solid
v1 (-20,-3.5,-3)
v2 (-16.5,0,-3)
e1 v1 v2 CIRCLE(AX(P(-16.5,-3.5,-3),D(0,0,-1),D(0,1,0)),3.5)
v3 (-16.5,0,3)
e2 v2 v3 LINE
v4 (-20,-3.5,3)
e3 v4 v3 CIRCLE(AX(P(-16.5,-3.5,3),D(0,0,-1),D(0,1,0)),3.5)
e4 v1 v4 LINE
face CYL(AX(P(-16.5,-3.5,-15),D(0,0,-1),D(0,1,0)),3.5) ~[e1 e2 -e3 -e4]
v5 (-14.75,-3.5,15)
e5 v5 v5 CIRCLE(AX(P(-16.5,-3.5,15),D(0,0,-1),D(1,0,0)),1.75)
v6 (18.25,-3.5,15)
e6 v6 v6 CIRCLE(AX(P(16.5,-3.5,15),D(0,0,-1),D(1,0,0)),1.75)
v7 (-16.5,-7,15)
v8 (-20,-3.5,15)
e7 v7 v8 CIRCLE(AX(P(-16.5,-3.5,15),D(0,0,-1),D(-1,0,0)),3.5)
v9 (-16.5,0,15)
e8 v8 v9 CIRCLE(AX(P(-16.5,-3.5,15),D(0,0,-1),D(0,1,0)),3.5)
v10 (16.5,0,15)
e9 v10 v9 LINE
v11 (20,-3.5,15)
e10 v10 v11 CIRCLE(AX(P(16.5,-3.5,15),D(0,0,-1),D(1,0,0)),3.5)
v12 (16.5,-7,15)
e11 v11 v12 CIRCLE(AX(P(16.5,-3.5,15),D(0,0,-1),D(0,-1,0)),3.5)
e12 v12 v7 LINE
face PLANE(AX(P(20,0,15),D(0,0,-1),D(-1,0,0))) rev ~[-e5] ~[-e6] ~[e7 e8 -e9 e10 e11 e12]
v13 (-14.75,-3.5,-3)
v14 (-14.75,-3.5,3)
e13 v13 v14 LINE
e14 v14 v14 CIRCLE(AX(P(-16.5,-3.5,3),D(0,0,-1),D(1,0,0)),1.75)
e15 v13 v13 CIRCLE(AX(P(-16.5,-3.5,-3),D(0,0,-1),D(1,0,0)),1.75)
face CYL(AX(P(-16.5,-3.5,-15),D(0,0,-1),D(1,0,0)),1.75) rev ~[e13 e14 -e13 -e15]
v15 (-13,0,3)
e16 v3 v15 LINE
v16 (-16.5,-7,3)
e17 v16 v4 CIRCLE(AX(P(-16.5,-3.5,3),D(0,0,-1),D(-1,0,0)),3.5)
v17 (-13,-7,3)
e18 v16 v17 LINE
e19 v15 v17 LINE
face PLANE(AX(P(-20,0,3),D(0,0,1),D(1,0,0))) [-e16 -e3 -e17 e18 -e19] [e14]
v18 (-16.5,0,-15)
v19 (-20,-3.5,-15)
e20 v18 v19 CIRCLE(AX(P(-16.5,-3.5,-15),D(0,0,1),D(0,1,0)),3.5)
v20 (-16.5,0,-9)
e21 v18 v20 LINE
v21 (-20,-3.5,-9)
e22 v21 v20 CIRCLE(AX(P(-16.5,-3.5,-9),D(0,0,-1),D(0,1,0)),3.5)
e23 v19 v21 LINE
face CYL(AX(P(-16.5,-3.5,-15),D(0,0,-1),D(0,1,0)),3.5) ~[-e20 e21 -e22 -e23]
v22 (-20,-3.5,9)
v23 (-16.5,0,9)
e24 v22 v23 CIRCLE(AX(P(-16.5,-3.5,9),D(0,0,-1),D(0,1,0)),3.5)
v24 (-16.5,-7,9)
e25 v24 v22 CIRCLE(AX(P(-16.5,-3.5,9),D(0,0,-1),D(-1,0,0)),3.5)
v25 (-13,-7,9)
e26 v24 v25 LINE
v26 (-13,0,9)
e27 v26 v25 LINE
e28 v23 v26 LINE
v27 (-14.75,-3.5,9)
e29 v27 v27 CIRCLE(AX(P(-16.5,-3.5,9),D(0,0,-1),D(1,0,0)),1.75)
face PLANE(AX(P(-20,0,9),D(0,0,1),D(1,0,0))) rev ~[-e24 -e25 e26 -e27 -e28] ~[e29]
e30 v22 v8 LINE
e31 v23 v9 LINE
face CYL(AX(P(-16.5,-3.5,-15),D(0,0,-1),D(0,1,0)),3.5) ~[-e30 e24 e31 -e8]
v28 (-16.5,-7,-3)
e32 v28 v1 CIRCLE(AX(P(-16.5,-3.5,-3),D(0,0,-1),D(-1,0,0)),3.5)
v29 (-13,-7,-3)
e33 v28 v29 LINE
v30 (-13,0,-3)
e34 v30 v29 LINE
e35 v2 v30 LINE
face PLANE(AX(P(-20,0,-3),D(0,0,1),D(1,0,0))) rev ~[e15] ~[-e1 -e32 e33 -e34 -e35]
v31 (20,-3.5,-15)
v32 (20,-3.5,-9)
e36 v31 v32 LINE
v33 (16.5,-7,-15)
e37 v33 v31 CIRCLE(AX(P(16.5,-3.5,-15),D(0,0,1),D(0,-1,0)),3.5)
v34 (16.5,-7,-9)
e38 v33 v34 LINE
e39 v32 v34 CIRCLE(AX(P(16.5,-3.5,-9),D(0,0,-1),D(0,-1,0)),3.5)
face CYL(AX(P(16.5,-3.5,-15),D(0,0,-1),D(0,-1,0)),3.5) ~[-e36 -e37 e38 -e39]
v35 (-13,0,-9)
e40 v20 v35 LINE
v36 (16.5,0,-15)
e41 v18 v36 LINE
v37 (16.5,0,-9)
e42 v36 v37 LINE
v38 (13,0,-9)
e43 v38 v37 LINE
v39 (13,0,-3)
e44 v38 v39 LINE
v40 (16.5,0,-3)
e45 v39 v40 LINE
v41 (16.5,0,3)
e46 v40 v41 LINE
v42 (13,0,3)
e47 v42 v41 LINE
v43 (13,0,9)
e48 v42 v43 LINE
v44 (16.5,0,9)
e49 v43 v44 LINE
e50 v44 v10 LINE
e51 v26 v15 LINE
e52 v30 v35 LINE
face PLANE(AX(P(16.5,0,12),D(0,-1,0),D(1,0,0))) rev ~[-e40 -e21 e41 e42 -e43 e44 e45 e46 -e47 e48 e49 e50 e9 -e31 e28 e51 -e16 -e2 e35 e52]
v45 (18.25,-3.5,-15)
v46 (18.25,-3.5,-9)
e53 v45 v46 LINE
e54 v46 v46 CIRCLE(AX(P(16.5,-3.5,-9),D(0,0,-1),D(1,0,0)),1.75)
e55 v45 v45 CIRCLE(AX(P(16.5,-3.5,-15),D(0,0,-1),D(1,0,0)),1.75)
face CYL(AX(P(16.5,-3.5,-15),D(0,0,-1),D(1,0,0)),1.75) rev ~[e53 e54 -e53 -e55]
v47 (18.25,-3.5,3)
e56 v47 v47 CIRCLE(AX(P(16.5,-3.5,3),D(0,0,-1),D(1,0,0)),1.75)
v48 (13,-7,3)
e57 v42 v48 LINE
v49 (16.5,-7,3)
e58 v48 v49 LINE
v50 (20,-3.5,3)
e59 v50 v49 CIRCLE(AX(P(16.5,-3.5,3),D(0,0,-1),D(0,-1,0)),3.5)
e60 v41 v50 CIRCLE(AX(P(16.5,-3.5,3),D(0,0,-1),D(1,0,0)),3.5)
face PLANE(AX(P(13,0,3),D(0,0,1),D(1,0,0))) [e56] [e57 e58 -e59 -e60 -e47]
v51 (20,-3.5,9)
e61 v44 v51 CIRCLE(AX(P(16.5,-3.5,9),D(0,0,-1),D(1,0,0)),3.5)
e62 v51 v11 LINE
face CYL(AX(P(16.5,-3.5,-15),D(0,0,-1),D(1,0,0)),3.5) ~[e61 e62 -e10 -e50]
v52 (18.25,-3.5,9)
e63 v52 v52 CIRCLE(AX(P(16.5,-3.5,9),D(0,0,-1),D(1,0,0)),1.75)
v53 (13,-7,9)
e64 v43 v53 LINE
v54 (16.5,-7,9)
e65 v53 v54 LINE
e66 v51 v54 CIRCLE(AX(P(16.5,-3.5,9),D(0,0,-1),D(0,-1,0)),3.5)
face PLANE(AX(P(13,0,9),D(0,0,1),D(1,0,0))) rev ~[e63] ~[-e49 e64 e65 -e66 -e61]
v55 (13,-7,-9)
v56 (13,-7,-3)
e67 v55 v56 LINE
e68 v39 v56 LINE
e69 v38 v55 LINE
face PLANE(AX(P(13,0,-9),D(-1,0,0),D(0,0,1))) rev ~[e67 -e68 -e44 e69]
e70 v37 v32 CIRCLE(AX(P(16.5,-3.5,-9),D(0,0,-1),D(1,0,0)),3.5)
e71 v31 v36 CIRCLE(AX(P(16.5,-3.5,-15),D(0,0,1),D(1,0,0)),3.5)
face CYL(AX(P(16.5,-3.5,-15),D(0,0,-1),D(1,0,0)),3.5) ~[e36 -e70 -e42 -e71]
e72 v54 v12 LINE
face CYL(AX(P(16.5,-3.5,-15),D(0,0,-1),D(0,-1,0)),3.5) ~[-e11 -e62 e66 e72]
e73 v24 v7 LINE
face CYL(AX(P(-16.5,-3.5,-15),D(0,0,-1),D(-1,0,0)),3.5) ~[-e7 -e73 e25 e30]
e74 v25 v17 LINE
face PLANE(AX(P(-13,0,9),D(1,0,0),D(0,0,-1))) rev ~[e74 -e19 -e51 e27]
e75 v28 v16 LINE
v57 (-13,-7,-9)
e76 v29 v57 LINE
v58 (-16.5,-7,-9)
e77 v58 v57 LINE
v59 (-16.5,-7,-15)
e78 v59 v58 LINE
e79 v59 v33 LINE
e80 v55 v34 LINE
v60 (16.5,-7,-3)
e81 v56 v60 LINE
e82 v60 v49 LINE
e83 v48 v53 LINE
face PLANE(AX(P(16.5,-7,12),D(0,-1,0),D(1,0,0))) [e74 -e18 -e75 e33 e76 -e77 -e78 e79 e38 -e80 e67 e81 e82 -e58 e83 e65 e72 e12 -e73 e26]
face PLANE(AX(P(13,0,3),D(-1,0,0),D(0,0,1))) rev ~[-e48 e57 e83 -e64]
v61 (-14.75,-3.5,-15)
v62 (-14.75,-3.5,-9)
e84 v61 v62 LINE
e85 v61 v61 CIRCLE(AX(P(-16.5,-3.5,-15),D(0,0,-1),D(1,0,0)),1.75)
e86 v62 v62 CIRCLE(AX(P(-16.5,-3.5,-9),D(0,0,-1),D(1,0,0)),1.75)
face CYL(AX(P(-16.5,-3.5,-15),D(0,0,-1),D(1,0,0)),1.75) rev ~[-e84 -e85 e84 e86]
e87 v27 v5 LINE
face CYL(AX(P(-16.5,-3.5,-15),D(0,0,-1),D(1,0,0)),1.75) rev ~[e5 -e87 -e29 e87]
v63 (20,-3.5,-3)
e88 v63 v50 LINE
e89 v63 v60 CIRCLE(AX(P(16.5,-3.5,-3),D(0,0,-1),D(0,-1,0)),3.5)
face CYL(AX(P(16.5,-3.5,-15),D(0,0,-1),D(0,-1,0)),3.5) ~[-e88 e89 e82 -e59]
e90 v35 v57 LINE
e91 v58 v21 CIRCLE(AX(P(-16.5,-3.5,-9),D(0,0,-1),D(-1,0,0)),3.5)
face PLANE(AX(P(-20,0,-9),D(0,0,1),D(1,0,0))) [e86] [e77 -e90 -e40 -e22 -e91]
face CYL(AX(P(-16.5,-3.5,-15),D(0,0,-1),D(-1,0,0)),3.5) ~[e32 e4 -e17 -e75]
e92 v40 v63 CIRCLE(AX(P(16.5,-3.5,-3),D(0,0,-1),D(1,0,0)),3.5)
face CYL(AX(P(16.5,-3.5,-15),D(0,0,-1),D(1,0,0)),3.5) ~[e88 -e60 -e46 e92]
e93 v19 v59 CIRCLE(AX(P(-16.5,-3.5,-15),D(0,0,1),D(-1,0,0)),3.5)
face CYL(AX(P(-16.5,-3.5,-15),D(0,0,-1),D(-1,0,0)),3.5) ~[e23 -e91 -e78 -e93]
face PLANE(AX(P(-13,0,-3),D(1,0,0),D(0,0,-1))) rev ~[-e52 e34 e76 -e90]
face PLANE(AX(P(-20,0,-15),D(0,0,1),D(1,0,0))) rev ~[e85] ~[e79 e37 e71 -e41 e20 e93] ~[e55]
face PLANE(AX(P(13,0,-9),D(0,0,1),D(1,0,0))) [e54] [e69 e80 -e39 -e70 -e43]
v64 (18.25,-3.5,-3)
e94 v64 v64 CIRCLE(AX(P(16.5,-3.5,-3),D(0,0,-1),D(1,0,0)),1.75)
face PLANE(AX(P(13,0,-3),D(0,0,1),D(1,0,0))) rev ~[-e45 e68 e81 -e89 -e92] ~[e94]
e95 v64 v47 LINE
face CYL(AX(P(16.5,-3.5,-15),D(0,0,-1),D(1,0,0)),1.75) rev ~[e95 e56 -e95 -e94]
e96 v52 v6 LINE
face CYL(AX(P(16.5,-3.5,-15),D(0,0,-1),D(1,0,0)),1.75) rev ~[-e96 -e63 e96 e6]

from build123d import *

# Parameters (mm, degrees)
F0_W     = 7
F0_H     = 6
F1_DEPTH = 7
F2_R     = 1.75
F3_DEPTH = 30.001


# Not quite as in the source:
# - a feature names something its author has since deleted; it is built from what else it names


with BuildPart() as f1:
    # F0 (on Front) → F1 (new body)
    with BuildSketch(Plane.XZ):
        with Locations((16.5, 12)):
            Rectangle(F0_W, F0_H)
        with Locations((16.5, -12)):
            Rectangle(F0_W, F0_H)
        with Locations((16.5, 0)):
            Rectangle(F0_W, F0_H)
        with Locations((-16.5, 12)):
            Rectangle(F0_W, F0_H)
        with Locations((-16.5, 0)):
            Rectangle(F0_W, F0_H)
        with Locations((-16.5, -12)):
            Rectangle(F0_W, F0_H)
        Polygon((13, 9), (13, 15), (-13, 15), (-13, 9), (-13, 3), (-13, -3), (-13, -9), (-13, -15), (13, -15), (13, -9), (13, -3), (13, 3), align=None)
    extrude(amount=F1_DEPTH)

    # F2 (on face) → F3 (cut, through all)
    with BuildSketch(Plane(origin=(0, 0, -15), x_dir=(1, 0, 0), z_dir=(0, 0, -1))):
        with Locations((-16.5, 3.5)):
            Circle(F2_R)
        with BuildLine():
            Line((-20, 0), (-16.5, 0))
            ThreePointArc((-16.5, 0), (-18.9748737342, 1.0251262658), (-20, 3.5))
            Line((-20, 3.5), (-20, 0))
        make_face()
        with BuildLine():
            ThreePointArc((-20, 3.5), (-18.9748737342, 5.9748737342), (-16.5, 7))
            Line((-16.5, 7), (-20, 7))
            Line((-20, 7), (-20, 3.5))
        make_face()
        with BuildLine():
            Line((20, 7), (16.5, 7))
            ThreePointArc((16.5, 7), (18.9748737342, 5.9748737342), (20, 3.5))
            Line((20, 3.5), (20, 7))
        make_face()
        with BuildLine():
            ThreePointArc((20, 3.5), (18.9748737342, 1.0251262658), (16.5, 0))
            Line((16.5, 0), (20, 0))
            Line((20, 0), (20, 3.5))
        make_face()
        with Locations((16.5, 3.5)):
            Circle(F2_R)
    extrude(amount=-F3_DEPTH, mode=Mode.SUBTRACT)


solid = f1.part
